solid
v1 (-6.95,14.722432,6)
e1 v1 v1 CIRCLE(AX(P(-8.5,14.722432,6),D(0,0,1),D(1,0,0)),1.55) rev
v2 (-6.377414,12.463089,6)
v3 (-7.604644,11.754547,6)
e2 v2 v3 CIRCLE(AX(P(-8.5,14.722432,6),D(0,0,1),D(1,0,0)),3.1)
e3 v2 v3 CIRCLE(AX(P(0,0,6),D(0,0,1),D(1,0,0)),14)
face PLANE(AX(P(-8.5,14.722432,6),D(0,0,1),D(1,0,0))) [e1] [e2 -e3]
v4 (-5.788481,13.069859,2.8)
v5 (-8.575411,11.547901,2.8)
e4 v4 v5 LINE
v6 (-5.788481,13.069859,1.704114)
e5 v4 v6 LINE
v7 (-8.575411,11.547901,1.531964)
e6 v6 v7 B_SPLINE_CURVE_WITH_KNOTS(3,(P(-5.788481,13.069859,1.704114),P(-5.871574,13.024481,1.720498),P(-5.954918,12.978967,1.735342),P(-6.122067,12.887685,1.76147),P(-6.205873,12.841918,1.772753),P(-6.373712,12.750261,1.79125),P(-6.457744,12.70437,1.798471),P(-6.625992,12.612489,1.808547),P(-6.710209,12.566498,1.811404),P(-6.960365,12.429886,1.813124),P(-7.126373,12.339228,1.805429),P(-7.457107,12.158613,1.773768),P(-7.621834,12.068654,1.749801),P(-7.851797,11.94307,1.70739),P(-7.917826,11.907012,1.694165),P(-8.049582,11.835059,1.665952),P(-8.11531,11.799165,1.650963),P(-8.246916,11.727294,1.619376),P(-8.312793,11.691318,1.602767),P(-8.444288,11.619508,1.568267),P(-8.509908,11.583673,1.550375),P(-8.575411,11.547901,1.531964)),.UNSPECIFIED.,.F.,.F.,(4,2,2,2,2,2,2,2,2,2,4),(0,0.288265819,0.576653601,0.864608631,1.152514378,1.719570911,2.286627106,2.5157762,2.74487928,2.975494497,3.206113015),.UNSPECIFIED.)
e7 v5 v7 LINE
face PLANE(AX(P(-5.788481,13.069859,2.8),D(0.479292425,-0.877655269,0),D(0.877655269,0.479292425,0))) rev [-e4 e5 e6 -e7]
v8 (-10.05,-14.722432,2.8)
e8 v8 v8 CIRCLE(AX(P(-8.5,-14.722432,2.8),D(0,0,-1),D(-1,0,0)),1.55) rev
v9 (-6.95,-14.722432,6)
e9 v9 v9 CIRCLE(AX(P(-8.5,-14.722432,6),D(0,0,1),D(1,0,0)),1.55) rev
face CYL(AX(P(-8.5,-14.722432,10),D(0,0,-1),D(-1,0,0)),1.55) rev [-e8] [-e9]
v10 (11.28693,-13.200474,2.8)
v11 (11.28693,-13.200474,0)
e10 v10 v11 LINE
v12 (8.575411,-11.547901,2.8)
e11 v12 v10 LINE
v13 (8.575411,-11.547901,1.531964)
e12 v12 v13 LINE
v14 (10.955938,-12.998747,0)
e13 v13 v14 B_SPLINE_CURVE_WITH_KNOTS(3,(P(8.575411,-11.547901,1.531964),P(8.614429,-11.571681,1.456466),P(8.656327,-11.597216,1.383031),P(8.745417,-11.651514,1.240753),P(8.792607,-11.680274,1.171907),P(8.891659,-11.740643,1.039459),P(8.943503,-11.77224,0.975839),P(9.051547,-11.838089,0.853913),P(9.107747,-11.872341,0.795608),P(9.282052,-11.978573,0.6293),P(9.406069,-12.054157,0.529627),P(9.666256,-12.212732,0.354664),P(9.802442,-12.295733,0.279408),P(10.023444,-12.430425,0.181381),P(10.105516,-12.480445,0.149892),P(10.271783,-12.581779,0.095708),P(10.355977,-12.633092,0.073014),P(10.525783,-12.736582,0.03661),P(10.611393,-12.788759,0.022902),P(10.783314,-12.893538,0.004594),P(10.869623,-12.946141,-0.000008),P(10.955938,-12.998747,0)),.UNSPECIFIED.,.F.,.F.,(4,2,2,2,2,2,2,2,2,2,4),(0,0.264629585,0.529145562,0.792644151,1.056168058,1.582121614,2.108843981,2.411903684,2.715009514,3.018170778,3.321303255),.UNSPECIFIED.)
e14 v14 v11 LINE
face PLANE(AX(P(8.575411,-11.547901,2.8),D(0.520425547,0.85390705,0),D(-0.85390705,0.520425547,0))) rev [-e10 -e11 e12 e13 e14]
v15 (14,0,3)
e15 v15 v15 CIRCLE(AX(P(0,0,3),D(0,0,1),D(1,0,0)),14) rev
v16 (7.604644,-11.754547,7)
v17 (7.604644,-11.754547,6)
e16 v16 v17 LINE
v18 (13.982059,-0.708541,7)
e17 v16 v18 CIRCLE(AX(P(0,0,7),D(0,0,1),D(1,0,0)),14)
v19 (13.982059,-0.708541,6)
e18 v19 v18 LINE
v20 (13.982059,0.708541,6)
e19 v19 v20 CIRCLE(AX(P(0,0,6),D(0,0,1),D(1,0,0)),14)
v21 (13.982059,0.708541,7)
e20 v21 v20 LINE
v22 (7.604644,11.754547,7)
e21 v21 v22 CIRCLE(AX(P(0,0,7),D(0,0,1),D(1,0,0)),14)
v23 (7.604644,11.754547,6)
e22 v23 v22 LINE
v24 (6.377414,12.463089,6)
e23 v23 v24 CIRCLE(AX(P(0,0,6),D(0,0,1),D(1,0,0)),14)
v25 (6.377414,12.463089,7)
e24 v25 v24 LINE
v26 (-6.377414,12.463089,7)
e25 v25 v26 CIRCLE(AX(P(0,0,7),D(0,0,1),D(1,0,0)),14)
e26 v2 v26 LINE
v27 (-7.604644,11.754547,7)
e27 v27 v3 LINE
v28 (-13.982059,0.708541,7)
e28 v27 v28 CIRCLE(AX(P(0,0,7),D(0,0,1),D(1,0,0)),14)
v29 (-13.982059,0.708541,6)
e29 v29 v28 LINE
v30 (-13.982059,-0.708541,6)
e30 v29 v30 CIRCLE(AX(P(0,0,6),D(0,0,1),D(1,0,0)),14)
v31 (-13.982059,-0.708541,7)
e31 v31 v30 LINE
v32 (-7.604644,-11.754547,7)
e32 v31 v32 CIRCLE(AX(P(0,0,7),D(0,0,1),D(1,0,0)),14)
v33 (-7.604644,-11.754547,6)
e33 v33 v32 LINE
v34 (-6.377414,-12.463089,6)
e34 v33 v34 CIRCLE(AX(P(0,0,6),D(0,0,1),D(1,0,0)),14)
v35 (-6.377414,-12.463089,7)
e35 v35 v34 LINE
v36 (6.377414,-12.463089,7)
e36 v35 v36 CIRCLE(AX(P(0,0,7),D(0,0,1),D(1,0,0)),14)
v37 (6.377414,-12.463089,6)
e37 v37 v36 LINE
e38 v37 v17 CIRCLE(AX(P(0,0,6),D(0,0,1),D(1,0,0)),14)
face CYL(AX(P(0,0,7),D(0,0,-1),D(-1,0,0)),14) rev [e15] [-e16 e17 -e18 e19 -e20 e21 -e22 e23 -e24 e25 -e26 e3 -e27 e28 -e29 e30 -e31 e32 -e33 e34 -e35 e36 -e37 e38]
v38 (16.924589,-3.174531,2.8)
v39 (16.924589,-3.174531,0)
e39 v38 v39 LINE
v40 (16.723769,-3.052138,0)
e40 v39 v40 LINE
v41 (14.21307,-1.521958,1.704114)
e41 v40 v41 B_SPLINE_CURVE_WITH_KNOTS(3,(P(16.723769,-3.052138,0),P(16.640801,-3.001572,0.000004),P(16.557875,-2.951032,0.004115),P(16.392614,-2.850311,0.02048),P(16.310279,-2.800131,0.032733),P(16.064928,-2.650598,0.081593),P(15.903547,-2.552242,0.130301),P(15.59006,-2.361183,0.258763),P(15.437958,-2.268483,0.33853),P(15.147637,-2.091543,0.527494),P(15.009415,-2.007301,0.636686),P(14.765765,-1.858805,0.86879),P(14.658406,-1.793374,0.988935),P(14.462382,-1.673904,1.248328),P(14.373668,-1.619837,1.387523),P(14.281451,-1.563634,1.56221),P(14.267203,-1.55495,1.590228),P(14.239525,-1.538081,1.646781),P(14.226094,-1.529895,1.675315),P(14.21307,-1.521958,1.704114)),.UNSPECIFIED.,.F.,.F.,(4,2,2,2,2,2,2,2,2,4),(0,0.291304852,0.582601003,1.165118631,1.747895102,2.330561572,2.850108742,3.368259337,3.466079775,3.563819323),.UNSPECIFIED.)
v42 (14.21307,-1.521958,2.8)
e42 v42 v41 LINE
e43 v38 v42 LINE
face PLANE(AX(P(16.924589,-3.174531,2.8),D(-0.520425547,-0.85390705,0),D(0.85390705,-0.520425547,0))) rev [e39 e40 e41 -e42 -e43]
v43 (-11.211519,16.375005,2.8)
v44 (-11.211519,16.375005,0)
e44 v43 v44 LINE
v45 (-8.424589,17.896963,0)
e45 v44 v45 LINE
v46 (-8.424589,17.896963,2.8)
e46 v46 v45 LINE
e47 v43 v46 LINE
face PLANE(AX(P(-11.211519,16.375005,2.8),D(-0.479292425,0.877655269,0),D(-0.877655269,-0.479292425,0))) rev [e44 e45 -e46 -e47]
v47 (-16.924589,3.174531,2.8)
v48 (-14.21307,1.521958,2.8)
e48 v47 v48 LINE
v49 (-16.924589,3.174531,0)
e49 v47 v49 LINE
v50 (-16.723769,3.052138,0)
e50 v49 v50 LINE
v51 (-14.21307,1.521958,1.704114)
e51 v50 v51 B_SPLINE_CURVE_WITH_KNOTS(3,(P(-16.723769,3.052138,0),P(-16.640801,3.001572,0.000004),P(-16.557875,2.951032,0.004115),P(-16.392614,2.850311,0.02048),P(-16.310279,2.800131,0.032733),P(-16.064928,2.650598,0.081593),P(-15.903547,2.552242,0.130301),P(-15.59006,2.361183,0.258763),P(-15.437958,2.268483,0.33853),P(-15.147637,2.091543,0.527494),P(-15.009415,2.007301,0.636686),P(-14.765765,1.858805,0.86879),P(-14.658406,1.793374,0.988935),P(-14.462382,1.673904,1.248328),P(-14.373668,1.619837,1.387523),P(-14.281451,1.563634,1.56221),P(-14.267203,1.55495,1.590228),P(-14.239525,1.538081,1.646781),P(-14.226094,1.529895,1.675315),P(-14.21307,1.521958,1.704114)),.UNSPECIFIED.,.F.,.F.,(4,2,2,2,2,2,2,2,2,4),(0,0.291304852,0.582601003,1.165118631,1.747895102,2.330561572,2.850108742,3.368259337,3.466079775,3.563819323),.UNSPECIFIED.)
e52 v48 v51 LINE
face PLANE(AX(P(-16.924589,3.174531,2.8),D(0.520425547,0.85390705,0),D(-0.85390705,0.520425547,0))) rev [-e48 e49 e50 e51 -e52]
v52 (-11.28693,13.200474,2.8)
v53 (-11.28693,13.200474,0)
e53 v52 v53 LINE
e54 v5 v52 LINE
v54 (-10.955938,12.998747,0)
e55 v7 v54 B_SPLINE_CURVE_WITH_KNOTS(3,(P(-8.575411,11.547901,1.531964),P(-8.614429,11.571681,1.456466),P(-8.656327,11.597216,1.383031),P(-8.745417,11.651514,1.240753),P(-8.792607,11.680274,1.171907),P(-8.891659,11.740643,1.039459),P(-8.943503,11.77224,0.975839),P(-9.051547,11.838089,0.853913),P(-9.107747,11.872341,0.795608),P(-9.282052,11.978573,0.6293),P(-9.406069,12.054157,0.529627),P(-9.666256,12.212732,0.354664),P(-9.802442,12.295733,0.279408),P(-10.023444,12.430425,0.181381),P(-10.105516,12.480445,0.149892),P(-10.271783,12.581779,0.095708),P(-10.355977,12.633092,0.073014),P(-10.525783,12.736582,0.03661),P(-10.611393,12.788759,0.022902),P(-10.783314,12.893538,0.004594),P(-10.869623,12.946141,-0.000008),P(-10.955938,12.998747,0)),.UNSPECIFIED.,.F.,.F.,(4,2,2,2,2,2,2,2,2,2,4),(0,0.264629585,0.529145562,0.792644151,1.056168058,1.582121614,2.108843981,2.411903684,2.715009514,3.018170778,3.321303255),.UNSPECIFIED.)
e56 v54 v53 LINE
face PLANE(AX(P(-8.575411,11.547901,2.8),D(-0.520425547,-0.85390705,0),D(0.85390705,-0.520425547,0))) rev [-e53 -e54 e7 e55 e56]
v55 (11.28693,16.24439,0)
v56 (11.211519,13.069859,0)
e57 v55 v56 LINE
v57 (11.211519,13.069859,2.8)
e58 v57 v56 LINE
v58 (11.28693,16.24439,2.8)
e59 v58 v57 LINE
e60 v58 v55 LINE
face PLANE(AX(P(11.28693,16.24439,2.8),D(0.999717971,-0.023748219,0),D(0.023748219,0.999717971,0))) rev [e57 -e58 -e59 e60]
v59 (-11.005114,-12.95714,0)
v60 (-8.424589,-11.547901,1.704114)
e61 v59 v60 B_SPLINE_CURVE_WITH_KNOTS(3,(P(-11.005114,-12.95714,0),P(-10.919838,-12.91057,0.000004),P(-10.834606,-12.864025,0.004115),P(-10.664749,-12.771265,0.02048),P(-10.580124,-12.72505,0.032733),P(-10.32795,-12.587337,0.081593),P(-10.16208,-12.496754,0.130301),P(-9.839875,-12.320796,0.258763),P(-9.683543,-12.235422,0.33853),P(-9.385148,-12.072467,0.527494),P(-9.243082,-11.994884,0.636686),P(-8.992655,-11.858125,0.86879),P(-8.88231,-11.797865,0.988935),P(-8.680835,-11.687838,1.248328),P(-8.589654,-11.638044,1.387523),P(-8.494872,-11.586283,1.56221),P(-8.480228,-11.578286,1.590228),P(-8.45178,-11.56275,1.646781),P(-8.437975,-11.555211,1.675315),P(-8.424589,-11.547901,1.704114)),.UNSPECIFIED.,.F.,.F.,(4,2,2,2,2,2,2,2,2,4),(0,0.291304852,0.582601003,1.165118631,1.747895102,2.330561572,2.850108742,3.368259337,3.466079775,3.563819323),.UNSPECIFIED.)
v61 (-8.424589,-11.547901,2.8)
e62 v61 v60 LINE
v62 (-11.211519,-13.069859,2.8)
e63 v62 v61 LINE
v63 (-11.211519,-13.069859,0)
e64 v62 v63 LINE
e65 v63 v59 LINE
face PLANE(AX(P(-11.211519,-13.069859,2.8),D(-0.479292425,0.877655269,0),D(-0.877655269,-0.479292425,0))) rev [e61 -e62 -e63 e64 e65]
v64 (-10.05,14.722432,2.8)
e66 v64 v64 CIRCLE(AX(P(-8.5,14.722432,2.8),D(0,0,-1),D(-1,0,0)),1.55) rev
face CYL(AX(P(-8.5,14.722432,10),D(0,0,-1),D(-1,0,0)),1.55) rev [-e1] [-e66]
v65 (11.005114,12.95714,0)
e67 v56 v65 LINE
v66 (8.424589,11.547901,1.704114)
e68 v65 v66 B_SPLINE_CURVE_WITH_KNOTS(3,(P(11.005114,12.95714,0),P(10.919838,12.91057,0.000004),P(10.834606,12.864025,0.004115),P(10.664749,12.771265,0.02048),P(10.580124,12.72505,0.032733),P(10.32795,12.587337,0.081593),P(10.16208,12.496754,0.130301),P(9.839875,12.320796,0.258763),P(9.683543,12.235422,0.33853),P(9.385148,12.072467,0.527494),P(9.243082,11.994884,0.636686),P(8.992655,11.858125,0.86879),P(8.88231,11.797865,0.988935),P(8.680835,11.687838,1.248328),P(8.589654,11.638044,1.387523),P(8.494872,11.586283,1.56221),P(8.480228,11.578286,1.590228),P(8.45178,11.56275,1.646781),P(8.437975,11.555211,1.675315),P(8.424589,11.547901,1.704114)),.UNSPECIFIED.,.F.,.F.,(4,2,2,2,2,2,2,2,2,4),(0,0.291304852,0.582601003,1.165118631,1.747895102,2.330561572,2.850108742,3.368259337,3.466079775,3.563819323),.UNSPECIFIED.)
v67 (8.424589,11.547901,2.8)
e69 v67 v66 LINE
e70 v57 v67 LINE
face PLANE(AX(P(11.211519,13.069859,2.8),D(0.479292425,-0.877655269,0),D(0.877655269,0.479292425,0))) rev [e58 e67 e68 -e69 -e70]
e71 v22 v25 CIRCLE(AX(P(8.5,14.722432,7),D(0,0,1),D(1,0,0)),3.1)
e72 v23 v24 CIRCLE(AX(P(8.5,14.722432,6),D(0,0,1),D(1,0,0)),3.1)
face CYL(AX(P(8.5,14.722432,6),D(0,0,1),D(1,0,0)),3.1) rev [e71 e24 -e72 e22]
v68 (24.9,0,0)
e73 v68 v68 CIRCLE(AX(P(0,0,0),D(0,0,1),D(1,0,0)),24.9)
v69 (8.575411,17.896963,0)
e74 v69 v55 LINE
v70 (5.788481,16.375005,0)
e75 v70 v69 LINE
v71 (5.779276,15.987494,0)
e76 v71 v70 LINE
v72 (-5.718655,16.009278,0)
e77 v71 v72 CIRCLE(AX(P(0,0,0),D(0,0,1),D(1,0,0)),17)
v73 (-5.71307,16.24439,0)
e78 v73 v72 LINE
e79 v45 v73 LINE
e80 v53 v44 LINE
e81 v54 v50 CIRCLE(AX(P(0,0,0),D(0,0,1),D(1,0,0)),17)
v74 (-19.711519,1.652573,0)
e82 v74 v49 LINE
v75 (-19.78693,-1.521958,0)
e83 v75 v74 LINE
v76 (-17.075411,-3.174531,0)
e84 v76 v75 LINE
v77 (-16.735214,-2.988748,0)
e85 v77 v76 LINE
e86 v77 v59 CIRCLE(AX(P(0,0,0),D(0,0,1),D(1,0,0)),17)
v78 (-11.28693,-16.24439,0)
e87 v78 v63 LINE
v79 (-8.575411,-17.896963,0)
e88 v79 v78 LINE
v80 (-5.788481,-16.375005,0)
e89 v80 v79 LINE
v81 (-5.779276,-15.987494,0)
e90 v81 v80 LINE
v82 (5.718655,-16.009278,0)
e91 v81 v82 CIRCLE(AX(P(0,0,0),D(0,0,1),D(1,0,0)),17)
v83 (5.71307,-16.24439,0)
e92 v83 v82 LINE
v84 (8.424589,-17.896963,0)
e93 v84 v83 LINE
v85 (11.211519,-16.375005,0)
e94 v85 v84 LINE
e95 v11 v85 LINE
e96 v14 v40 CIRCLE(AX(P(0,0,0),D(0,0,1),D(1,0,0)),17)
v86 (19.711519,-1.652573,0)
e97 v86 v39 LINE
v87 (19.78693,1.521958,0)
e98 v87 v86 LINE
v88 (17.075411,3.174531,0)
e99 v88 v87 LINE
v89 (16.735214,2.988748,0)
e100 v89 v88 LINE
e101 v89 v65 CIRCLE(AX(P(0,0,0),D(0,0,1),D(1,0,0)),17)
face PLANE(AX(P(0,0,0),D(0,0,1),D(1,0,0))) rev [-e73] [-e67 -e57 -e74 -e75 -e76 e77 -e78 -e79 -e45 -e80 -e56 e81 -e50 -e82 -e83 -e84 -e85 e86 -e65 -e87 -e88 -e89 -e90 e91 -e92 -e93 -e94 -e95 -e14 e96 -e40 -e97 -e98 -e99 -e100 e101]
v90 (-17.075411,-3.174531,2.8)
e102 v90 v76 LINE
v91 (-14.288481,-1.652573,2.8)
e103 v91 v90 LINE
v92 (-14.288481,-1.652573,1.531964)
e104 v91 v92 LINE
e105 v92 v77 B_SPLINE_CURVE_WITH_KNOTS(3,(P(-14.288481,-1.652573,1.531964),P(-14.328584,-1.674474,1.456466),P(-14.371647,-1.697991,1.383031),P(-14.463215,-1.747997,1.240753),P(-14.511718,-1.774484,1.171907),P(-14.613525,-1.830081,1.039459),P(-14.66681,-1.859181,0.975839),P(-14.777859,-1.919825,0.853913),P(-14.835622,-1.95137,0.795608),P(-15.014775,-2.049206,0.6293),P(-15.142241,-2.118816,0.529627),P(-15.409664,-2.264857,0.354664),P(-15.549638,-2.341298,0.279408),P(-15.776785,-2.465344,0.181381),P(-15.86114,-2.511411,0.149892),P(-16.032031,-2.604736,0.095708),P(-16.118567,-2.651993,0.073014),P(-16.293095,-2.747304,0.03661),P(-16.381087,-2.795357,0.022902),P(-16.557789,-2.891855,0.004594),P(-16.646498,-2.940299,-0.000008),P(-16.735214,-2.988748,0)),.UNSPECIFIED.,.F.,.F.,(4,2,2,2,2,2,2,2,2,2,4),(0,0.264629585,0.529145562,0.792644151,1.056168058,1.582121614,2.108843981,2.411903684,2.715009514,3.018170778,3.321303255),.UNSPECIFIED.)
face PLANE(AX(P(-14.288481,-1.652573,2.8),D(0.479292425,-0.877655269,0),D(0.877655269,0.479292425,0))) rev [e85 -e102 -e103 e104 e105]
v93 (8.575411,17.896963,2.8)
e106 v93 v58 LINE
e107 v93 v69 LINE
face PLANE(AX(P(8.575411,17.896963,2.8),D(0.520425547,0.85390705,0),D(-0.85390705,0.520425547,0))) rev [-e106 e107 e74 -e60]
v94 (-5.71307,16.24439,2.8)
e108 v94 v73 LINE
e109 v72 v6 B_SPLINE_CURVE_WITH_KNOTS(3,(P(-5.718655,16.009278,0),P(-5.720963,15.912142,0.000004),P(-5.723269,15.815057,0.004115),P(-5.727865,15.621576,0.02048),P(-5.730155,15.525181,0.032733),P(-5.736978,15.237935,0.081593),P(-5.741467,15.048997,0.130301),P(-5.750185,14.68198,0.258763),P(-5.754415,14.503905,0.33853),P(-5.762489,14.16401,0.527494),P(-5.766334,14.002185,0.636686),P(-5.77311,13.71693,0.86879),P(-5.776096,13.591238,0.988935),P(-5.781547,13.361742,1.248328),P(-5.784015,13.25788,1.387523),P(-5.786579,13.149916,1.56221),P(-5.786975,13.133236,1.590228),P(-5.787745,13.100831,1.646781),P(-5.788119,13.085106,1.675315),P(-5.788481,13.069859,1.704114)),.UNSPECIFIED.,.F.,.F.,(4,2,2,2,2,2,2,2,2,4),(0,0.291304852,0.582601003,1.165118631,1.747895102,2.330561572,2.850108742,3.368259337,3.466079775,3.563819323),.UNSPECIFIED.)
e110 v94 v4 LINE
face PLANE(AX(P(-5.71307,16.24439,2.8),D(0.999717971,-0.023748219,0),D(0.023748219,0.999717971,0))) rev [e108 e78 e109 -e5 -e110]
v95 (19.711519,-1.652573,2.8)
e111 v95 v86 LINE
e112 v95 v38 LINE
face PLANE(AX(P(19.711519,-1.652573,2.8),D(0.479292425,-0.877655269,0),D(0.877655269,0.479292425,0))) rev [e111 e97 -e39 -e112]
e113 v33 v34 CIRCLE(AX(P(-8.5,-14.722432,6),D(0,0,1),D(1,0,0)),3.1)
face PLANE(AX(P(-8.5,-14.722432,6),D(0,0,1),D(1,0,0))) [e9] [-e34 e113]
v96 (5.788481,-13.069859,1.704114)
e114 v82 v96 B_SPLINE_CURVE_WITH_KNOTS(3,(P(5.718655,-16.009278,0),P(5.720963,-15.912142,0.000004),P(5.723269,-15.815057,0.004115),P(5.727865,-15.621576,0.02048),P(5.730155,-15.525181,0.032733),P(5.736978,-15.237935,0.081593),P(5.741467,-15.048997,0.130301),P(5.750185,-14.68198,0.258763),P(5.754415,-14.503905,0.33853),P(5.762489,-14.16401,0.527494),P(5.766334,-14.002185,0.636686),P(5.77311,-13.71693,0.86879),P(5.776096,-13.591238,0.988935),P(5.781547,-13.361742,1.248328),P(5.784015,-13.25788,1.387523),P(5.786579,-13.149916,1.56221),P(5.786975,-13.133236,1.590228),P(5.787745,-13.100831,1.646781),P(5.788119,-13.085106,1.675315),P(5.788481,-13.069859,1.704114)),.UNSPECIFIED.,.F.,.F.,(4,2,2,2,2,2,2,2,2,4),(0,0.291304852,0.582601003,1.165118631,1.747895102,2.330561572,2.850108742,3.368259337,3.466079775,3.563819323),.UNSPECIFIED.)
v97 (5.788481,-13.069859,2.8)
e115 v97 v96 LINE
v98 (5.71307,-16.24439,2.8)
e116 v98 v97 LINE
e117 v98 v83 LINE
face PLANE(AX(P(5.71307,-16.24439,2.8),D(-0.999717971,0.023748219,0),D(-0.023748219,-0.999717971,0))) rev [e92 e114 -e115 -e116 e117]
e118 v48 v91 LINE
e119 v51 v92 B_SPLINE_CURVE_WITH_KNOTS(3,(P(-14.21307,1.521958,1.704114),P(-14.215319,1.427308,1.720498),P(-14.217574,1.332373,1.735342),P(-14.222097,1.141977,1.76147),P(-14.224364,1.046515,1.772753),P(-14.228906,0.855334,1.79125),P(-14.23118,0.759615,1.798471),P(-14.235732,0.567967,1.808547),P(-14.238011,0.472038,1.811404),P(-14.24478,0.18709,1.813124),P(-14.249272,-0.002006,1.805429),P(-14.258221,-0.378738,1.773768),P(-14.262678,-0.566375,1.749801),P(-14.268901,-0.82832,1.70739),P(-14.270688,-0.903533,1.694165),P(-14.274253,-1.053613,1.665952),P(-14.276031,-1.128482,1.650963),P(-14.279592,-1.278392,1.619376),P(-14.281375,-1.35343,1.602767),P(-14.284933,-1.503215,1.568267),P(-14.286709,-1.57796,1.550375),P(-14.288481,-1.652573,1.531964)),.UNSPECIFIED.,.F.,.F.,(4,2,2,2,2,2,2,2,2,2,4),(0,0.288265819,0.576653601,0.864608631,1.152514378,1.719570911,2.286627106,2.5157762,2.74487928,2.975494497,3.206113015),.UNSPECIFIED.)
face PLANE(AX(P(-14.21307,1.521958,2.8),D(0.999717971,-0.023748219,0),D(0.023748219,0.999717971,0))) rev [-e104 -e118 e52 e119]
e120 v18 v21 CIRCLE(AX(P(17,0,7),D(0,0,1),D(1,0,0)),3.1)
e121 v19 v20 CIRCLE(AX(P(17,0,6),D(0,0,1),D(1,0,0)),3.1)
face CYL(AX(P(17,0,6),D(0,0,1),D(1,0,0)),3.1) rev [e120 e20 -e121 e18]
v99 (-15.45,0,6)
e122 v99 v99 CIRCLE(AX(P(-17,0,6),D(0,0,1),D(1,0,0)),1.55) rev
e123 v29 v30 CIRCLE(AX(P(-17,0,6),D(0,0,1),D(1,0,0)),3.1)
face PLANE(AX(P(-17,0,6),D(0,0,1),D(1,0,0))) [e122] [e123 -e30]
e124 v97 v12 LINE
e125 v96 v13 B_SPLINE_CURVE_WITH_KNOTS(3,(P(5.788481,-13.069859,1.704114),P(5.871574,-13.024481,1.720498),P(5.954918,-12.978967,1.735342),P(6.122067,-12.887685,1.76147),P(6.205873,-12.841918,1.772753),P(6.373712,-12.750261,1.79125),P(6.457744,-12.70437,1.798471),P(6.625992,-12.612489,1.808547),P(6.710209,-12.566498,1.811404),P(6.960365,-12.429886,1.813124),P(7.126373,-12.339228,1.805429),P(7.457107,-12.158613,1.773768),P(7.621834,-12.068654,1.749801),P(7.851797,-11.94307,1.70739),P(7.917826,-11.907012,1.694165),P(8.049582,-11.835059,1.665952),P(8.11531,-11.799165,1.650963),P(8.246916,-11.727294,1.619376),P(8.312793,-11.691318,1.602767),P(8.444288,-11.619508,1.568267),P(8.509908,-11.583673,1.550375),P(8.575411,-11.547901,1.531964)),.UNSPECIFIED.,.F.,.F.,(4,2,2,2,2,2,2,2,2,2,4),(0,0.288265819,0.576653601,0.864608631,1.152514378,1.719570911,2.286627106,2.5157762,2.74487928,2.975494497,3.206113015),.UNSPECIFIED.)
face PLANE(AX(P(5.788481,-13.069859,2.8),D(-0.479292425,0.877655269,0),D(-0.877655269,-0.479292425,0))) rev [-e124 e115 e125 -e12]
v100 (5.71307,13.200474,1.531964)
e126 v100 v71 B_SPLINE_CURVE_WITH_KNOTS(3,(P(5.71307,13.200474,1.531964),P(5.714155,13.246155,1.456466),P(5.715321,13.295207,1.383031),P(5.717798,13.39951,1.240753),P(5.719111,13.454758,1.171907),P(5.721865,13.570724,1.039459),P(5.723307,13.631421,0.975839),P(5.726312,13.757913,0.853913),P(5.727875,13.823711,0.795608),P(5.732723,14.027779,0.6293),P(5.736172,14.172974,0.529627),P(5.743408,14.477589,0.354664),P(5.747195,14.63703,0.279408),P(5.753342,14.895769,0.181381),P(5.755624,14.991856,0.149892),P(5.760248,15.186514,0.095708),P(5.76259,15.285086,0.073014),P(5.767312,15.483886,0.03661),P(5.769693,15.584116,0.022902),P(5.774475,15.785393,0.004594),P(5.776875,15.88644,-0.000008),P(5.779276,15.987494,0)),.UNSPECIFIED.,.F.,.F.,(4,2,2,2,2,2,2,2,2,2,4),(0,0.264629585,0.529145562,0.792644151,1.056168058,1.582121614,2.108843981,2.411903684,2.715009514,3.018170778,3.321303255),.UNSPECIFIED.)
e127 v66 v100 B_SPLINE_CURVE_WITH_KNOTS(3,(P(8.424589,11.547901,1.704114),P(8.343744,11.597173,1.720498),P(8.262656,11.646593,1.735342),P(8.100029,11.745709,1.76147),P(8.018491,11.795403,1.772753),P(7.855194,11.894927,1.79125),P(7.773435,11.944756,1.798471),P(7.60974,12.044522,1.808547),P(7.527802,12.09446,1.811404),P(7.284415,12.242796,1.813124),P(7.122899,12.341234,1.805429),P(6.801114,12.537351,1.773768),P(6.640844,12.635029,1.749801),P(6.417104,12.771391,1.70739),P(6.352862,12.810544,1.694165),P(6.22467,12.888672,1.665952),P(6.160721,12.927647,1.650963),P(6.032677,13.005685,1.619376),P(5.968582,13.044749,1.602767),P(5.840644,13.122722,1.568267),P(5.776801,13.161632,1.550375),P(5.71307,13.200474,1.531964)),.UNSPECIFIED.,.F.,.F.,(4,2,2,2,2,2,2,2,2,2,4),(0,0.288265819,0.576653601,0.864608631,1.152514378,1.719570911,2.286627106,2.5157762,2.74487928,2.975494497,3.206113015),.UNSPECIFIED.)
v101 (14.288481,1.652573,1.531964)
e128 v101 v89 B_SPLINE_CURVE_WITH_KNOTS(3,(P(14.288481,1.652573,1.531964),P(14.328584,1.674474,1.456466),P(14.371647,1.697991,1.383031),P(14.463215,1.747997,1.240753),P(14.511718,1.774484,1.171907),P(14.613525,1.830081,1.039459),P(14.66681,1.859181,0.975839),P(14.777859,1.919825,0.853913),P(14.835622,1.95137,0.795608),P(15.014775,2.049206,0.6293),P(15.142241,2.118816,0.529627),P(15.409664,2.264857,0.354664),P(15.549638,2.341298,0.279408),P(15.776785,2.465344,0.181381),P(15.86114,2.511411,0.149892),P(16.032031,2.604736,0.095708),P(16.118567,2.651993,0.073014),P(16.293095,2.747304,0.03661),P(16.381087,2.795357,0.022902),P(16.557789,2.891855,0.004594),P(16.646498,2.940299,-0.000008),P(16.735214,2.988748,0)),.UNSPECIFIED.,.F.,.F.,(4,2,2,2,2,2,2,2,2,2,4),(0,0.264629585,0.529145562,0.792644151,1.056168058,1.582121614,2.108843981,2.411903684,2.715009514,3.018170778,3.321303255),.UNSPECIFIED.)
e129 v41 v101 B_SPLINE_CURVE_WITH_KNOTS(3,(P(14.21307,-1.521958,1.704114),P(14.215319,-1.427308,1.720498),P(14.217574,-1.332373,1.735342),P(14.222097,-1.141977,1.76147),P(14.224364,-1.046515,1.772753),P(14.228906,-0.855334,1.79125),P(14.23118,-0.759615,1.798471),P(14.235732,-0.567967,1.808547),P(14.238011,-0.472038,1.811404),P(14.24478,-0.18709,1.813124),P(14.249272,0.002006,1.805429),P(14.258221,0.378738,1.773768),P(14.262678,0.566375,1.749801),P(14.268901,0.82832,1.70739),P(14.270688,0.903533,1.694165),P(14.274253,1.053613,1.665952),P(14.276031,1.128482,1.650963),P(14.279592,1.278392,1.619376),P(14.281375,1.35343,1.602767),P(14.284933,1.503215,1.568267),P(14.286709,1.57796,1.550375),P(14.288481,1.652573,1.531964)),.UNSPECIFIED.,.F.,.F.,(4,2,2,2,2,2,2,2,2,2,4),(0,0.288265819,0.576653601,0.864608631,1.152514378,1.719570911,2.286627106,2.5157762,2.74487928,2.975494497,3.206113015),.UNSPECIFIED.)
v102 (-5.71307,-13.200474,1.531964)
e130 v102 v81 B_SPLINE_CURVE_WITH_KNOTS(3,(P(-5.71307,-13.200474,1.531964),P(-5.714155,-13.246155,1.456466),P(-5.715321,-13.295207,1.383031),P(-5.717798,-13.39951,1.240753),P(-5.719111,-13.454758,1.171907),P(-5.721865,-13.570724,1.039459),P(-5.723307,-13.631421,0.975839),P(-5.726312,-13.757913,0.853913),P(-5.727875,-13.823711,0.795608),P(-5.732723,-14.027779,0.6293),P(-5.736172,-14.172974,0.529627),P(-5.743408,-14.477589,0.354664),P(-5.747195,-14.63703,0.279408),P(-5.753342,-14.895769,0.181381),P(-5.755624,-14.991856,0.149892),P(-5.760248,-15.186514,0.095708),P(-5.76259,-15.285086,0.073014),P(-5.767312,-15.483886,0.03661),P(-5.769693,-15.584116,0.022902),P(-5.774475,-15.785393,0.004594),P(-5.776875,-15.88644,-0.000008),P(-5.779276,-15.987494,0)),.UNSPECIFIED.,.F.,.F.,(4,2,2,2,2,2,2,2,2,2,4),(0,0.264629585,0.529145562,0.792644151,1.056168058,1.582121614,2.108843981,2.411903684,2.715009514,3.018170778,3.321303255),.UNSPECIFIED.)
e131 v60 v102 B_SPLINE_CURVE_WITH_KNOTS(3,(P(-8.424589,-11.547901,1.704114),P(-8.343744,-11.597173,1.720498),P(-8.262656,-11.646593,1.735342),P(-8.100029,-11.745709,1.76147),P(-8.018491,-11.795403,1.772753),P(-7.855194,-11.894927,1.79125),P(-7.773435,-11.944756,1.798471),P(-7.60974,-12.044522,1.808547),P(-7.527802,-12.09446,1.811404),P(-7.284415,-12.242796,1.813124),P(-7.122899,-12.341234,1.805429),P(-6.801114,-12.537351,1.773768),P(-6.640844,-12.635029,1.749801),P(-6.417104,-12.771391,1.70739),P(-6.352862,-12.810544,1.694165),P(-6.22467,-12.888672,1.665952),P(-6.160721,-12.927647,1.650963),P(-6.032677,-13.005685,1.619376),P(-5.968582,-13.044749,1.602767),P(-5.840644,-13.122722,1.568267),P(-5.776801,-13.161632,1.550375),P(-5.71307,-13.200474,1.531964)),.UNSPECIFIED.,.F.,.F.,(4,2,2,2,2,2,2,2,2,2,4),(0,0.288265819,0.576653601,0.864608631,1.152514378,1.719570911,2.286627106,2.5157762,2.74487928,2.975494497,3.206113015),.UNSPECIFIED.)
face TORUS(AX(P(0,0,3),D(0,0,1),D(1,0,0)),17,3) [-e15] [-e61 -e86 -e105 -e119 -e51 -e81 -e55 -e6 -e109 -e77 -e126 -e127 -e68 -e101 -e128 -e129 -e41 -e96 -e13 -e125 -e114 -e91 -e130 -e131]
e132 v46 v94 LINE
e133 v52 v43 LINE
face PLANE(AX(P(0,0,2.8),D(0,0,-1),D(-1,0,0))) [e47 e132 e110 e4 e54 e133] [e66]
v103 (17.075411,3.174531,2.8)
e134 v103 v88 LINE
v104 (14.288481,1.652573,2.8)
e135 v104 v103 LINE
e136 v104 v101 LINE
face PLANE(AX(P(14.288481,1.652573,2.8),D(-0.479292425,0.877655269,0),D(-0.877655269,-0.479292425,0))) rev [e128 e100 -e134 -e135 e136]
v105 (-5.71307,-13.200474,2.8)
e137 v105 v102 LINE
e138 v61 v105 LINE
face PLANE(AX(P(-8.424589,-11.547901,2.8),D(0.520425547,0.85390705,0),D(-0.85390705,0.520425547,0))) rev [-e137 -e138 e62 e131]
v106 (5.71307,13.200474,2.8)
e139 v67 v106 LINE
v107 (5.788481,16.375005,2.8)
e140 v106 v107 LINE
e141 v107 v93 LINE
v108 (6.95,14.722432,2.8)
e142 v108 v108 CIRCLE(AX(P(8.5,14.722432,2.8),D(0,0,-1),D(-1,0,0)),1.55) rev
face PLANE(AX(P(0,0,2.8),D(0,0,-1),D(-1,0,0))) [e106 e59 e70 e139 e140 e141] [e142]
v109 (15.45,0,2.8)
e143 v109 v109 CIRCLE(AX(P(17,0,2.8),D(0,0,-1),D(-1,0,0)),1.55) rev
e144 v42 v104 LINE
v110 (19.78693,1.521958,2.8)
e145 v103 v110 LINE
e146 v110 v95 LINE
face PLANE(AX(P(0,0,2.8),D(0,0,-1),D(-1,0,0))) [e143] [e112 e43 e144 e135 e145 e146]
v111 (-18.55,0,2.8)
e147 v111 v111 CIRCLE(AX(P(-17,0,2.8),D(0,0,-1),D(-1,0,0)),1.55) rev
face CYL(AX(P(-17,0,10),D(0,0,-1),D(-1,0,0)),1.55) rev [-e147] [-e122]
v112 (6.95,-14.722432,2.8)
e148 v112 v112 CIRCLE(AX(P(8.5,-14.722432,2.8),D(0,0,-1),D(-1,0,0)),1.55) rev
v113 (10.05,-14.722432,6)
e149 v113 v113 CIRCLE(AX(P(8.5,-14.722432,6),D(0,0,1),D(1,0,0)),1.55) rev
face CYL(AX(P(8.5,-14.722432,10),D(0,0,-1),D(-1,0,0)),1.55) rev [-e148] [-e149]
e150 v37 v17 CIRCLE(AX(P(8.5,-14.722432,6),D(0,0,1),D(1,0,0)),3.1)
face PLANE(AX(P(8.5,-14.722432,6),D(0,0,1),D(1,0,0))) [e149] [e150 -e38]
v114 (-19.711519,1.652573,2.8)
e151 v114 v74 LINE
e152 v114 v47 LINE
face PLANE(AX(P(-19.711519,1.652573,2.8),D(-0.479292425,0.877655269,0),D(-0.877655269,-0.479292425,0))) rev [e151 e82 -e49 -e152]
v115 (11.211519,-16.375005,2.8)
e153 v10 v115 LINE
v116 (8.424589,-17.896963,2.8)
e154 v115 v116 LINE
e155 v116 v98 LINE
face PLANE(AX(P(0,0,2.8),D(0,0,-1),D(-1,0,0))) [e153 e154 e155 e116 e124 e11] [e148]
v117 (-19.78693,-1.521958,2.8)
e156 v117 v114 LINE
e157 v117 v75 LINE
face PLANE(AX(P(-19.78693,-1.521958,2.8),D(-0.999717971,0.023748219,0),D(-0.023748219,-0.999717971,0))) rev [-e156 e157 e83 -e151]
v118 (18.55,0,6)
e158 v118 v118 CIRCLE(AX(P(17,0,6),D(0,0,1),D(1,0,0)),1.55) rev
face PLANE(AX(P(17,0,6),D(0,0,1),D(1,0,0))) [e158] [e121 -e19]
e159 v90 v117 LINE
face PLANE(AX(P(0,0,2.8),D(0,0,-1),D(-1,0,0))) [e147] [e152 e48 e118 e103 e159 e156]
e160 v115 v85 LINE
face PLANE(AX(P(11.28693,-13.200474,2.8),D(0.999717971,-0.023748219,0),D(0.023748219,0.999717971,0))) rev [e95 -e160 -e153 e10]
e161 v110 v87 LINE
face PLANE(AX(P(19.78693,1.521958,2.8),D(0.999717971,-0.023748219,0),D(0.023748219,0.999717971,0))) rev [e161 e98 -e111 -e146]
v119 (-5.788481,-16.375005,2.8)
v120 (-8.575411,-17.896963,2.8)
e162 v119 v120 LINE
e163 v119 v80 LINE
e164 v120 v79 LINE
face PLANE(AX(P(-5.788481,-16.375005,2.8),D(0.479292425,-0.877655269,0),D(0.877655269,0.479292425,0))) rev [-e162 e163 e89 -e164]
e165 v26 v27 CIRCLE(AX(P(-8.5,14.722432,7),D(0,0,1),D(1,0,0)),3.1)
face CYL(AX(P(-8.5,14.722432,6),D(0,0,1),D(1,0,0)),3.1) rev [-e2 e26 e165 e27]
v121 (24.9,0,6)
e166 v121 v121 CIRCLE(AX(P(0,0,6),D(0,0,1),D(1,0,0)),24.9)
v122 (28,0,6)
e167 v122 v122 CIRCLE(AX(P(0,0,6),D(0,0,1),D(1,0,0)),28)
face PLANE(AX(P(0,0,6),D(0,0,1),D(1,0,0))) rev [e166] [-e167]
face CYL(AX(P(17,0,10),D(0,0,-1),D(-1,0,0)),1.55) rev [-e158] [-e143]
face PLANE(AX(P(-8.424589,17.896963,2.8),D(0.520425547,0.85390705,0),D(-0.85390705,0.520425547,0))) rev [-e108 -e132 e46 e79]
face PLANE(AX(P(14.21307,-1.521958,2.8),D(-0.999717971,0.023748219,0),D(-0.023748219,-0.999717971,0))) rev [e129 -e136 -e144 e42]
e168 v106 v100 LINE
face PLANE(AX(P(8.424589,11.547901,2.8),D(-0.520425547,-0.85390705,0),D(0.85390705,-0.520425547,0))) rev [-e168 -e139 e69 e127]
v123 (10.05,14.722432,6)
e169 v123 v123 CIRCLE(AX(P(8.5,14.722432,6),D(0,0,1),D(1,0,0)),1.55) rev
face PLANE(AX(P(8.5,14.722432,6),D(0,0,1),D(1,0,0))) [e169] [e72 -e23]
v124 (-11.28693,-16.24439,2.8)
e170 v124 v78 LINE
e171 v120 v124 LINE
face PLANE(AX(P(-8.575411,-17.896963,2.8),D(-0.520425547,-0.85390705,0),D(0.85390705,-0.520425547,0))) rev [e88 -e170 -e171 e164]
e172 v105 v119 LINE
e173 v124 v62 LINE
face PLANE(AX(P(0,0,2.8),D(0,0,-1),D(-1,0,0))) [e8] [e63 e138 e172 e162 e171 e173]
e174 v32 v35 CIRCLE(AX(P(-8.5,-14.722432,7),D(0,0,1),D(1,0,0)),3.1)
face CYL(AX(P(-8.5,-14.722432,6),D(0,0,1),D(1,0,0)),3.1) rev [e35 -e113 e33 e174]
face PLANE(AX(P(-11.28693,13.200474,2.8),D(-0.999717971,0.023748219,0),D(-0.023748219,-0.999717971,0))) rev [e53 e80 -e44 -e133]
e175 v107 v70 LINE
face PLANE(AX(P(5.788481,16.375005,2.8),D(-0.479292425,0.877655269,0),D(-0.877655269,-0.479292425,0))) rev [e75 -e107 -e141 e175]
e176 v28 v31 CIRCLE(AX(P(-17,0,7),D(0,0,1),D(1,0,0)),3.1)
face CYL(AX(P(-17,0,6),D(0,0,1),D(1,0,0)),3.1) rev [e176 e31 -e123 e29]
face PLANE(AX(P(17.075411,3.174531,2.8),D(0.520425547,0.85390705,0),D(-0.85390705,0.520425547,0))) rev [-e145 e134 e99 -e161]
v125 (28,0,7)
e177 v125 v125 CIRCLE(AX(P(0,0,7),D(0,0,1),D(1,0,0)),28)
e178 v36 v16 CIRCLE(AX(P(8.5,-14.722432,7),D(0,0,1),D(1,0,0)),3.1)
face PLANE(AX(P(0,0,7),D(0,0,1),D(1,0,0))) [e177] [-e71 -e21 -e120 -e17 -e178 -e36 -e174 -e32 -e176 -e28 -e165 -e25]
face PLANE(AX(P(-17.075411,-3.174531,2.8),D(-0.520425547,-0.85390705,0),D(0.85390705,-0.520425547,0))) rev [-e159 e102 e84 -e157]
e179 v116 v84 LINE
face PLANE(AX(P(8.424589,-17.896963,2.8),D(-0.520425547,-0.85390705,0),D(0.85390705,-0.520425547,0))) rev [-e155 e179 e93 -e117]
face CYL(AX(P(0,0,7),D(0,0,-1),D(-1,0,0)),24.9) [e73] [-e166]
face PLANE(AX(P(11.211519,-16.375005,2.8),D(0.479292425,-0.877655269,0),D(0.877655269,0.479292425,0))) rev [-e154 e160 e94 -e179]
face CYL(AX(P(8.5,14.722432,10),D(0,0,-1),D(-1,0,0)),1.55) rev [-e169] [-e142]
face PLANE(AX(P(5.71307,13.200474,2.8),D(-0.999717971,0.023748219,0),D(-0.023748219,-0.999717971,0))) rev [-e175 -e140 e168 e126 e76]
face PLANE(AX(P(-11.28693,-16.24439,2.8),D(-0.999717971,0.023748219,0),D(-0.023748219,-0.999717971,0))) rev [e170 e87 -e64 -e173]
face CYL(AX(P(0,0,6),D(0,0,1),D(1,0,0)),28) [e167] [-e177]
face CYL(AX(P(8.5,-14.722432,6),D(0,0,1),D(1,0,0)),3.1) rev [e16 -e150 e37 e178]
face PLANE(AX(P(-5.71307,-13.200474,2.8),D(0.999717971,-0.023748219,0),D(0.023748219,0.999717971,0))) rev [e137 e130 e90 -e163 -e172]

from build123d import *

# Parameters (mm, degrees)
SKETCH_1_R          = 24.9
SKETCH_1_R_2        = 14
EXTRUDE_1_DEPTH     = 7
SKETCH_3_R          = 1.55
CUT_EXTRUDE_2_DEPTH = 10
SKETCH_4_R          = 3.1
CUT_EXTRUDE_3_DEPTH = 1
EXTRUDE_START       = -1
SKETCH_6_R          = 28
SKETCH_6_R_2        = 24.9
EXTRUDE_2_DEPTH     = 1
CUT_EXTRUDE_4_DEPTH = 2.8
FILLET_1_R          = 3


with BuildPart() as part:
    # 草图1 → 凸台-拉伸1 (new body)
    with BuildSketch(Plane.XY):
        Circle(SKETCH_1_R)
        Circle(SKETCH_1_R_2, mode=Mode.SUBTRACT)
    extrude(amount=EXTRUDE_1_DEPTH)

    # 草图3 → 切除-拉伸2 (cut)
    with BuildSketch(Plane(origin=(0, 0, 0), x_dir=(-1, 0, 0), z_dir=(0, 0, -1))):
        with Locations((8.5, -14.722431864)):
            Circle(SKETCH_3_R)
        with Locations((-8.5, -14.722431864)):
            Circle(SKETCH_3_R)
        with Locations((-17, 0)):
            Circle(SKETCH_3_R)
        with Locations((-8.5, 14.722431864)):
            Circle(SKETCH_3_R)
        with Locations((17, 0)):
            Circle(SKETCH_3_R)
        with Locations((8.5, 14.722431864)):
            Circle(SKETCH_3_R)
    extrude(amount=-CUT_EXTRUDE_2_DEPTH, mode=Mode.SUBTRACT)

    # 草图4 → 切除-拉伸3 (cut)
    with BuildSketch(Plane.XY.offset(7)):
        with Locations((17, 0)):
            Circle(SKETCH_4_R)
        with Locations((8.5, -14.722431864)):
            Circle(SKETCH_4_R)
        with Locations((-8.5, -14.722431864)):
            Circle(SKETCH_4_R)
        with Locations((-17, 0)):
            Circle(SKETCH_4_R)
        with Locations((-8.5, 14.722431864)):
            Circle(SKETCH_4_R)
        with Locations((8.5, 14.722431864)):
            Circle(SKETCH_4_R)
    extrude(amount=-CUT_EXTRUDE_3_DEPTH, mode=Mode.SUBTRACT)

    # 草图6 → 凸台-拉伸2 (add)
    with BuildSketch(Plane.XY.offset(7).offset(EXTRUDE_START)):
        Circle(SKETCH_6_R)
        Circle(SKETCH_6_R_2, mode=Mode.SUBTRACT)
    extrude(amount=EXTRUDE_2_DEPTH)

    # 草图7 → 切除-拉伸4 (cut)
    with BuildSketch(Plane(origin=(0, 0, 0), x_dir=(-1, 0, 0), z_dir=(0, 0, -1))):
        Polygon((8.575410724, -17.896962783), (11.286929783, -16.244389721), (11.211519059, -13.069858802), (8.424589276, -11.547900945), (5.713070217, -13.200474007), (5.788480941, -16.375004926), align=None)
        Polygon((19.786929783, -1.521957857), (19.711519059, 1.652573062), (16.924589276, 3.174530919), (14.213070217, 1.521957857), (14.288480941, -1.652573062), (17.075410724, -3.174530919), align=None)
        Polygon((-11.211519059, -16.375004926), (-8.424589276, -17.896962783), (-5.713070217, -16.244389721), (-5.788480941, -13.069858802), (-8.575410724, -11.547900945), (-11.286929783, -13.200474007), align=None)
        Polygon((-19.786929783, 1.521957857), (-19.711519059, -1.652573062), (-16.924589276, -3.174530919), (-14.213070217, -1.521957857), (-14.288480941, 1.652573062), (-17.075410724, 3.174530919), align=None)
        Polygon((-8.575410724, 17.896962783), (-11.286929783, 16.244389721), (-11.211519059, 13.069858802), (-8.424589276, 11.547900945), (-5.713070217, 13.200474007), (-5.788480941, 16.375004926), align=None)
        Polygon((11.211519059, 16.375004926), (8.424589276, 17.896962783), (5.713070217, 16.244389721), (5.788480941, 13.069858802), (8.575410724, 11.547900945), (11.286929783, 13.200474007), align=None)
    extrude(amount=-CUT_EXTRUDE_4_DEPTH, mode=Mode.SUBTRACT)

    # 圆角1
    # the kernel refuses this fillet: 3 mm, written as the material it takes off along each edge
    with BuildSketch(Plane(origin=(0, 0, 0), x_dir=(1, 0, 0), z_dir=(0, -1, 0))) as fillet_1_piece_1:
        with BuildLine():
            CenterArc((14 + FILLET_1_R, FILLET_1_R), FILLET_1_R, 180, 90)
            Line((14, FILLET_1_R), (14, 0))
            Line((14, 0), (14 + FILLET_1_R, 0))
        make_face()
    revolve(axis=Axis((0, 0, 0), (0, 0, 1)), mode=Mode.SUBTRACT)


solid = part.part
